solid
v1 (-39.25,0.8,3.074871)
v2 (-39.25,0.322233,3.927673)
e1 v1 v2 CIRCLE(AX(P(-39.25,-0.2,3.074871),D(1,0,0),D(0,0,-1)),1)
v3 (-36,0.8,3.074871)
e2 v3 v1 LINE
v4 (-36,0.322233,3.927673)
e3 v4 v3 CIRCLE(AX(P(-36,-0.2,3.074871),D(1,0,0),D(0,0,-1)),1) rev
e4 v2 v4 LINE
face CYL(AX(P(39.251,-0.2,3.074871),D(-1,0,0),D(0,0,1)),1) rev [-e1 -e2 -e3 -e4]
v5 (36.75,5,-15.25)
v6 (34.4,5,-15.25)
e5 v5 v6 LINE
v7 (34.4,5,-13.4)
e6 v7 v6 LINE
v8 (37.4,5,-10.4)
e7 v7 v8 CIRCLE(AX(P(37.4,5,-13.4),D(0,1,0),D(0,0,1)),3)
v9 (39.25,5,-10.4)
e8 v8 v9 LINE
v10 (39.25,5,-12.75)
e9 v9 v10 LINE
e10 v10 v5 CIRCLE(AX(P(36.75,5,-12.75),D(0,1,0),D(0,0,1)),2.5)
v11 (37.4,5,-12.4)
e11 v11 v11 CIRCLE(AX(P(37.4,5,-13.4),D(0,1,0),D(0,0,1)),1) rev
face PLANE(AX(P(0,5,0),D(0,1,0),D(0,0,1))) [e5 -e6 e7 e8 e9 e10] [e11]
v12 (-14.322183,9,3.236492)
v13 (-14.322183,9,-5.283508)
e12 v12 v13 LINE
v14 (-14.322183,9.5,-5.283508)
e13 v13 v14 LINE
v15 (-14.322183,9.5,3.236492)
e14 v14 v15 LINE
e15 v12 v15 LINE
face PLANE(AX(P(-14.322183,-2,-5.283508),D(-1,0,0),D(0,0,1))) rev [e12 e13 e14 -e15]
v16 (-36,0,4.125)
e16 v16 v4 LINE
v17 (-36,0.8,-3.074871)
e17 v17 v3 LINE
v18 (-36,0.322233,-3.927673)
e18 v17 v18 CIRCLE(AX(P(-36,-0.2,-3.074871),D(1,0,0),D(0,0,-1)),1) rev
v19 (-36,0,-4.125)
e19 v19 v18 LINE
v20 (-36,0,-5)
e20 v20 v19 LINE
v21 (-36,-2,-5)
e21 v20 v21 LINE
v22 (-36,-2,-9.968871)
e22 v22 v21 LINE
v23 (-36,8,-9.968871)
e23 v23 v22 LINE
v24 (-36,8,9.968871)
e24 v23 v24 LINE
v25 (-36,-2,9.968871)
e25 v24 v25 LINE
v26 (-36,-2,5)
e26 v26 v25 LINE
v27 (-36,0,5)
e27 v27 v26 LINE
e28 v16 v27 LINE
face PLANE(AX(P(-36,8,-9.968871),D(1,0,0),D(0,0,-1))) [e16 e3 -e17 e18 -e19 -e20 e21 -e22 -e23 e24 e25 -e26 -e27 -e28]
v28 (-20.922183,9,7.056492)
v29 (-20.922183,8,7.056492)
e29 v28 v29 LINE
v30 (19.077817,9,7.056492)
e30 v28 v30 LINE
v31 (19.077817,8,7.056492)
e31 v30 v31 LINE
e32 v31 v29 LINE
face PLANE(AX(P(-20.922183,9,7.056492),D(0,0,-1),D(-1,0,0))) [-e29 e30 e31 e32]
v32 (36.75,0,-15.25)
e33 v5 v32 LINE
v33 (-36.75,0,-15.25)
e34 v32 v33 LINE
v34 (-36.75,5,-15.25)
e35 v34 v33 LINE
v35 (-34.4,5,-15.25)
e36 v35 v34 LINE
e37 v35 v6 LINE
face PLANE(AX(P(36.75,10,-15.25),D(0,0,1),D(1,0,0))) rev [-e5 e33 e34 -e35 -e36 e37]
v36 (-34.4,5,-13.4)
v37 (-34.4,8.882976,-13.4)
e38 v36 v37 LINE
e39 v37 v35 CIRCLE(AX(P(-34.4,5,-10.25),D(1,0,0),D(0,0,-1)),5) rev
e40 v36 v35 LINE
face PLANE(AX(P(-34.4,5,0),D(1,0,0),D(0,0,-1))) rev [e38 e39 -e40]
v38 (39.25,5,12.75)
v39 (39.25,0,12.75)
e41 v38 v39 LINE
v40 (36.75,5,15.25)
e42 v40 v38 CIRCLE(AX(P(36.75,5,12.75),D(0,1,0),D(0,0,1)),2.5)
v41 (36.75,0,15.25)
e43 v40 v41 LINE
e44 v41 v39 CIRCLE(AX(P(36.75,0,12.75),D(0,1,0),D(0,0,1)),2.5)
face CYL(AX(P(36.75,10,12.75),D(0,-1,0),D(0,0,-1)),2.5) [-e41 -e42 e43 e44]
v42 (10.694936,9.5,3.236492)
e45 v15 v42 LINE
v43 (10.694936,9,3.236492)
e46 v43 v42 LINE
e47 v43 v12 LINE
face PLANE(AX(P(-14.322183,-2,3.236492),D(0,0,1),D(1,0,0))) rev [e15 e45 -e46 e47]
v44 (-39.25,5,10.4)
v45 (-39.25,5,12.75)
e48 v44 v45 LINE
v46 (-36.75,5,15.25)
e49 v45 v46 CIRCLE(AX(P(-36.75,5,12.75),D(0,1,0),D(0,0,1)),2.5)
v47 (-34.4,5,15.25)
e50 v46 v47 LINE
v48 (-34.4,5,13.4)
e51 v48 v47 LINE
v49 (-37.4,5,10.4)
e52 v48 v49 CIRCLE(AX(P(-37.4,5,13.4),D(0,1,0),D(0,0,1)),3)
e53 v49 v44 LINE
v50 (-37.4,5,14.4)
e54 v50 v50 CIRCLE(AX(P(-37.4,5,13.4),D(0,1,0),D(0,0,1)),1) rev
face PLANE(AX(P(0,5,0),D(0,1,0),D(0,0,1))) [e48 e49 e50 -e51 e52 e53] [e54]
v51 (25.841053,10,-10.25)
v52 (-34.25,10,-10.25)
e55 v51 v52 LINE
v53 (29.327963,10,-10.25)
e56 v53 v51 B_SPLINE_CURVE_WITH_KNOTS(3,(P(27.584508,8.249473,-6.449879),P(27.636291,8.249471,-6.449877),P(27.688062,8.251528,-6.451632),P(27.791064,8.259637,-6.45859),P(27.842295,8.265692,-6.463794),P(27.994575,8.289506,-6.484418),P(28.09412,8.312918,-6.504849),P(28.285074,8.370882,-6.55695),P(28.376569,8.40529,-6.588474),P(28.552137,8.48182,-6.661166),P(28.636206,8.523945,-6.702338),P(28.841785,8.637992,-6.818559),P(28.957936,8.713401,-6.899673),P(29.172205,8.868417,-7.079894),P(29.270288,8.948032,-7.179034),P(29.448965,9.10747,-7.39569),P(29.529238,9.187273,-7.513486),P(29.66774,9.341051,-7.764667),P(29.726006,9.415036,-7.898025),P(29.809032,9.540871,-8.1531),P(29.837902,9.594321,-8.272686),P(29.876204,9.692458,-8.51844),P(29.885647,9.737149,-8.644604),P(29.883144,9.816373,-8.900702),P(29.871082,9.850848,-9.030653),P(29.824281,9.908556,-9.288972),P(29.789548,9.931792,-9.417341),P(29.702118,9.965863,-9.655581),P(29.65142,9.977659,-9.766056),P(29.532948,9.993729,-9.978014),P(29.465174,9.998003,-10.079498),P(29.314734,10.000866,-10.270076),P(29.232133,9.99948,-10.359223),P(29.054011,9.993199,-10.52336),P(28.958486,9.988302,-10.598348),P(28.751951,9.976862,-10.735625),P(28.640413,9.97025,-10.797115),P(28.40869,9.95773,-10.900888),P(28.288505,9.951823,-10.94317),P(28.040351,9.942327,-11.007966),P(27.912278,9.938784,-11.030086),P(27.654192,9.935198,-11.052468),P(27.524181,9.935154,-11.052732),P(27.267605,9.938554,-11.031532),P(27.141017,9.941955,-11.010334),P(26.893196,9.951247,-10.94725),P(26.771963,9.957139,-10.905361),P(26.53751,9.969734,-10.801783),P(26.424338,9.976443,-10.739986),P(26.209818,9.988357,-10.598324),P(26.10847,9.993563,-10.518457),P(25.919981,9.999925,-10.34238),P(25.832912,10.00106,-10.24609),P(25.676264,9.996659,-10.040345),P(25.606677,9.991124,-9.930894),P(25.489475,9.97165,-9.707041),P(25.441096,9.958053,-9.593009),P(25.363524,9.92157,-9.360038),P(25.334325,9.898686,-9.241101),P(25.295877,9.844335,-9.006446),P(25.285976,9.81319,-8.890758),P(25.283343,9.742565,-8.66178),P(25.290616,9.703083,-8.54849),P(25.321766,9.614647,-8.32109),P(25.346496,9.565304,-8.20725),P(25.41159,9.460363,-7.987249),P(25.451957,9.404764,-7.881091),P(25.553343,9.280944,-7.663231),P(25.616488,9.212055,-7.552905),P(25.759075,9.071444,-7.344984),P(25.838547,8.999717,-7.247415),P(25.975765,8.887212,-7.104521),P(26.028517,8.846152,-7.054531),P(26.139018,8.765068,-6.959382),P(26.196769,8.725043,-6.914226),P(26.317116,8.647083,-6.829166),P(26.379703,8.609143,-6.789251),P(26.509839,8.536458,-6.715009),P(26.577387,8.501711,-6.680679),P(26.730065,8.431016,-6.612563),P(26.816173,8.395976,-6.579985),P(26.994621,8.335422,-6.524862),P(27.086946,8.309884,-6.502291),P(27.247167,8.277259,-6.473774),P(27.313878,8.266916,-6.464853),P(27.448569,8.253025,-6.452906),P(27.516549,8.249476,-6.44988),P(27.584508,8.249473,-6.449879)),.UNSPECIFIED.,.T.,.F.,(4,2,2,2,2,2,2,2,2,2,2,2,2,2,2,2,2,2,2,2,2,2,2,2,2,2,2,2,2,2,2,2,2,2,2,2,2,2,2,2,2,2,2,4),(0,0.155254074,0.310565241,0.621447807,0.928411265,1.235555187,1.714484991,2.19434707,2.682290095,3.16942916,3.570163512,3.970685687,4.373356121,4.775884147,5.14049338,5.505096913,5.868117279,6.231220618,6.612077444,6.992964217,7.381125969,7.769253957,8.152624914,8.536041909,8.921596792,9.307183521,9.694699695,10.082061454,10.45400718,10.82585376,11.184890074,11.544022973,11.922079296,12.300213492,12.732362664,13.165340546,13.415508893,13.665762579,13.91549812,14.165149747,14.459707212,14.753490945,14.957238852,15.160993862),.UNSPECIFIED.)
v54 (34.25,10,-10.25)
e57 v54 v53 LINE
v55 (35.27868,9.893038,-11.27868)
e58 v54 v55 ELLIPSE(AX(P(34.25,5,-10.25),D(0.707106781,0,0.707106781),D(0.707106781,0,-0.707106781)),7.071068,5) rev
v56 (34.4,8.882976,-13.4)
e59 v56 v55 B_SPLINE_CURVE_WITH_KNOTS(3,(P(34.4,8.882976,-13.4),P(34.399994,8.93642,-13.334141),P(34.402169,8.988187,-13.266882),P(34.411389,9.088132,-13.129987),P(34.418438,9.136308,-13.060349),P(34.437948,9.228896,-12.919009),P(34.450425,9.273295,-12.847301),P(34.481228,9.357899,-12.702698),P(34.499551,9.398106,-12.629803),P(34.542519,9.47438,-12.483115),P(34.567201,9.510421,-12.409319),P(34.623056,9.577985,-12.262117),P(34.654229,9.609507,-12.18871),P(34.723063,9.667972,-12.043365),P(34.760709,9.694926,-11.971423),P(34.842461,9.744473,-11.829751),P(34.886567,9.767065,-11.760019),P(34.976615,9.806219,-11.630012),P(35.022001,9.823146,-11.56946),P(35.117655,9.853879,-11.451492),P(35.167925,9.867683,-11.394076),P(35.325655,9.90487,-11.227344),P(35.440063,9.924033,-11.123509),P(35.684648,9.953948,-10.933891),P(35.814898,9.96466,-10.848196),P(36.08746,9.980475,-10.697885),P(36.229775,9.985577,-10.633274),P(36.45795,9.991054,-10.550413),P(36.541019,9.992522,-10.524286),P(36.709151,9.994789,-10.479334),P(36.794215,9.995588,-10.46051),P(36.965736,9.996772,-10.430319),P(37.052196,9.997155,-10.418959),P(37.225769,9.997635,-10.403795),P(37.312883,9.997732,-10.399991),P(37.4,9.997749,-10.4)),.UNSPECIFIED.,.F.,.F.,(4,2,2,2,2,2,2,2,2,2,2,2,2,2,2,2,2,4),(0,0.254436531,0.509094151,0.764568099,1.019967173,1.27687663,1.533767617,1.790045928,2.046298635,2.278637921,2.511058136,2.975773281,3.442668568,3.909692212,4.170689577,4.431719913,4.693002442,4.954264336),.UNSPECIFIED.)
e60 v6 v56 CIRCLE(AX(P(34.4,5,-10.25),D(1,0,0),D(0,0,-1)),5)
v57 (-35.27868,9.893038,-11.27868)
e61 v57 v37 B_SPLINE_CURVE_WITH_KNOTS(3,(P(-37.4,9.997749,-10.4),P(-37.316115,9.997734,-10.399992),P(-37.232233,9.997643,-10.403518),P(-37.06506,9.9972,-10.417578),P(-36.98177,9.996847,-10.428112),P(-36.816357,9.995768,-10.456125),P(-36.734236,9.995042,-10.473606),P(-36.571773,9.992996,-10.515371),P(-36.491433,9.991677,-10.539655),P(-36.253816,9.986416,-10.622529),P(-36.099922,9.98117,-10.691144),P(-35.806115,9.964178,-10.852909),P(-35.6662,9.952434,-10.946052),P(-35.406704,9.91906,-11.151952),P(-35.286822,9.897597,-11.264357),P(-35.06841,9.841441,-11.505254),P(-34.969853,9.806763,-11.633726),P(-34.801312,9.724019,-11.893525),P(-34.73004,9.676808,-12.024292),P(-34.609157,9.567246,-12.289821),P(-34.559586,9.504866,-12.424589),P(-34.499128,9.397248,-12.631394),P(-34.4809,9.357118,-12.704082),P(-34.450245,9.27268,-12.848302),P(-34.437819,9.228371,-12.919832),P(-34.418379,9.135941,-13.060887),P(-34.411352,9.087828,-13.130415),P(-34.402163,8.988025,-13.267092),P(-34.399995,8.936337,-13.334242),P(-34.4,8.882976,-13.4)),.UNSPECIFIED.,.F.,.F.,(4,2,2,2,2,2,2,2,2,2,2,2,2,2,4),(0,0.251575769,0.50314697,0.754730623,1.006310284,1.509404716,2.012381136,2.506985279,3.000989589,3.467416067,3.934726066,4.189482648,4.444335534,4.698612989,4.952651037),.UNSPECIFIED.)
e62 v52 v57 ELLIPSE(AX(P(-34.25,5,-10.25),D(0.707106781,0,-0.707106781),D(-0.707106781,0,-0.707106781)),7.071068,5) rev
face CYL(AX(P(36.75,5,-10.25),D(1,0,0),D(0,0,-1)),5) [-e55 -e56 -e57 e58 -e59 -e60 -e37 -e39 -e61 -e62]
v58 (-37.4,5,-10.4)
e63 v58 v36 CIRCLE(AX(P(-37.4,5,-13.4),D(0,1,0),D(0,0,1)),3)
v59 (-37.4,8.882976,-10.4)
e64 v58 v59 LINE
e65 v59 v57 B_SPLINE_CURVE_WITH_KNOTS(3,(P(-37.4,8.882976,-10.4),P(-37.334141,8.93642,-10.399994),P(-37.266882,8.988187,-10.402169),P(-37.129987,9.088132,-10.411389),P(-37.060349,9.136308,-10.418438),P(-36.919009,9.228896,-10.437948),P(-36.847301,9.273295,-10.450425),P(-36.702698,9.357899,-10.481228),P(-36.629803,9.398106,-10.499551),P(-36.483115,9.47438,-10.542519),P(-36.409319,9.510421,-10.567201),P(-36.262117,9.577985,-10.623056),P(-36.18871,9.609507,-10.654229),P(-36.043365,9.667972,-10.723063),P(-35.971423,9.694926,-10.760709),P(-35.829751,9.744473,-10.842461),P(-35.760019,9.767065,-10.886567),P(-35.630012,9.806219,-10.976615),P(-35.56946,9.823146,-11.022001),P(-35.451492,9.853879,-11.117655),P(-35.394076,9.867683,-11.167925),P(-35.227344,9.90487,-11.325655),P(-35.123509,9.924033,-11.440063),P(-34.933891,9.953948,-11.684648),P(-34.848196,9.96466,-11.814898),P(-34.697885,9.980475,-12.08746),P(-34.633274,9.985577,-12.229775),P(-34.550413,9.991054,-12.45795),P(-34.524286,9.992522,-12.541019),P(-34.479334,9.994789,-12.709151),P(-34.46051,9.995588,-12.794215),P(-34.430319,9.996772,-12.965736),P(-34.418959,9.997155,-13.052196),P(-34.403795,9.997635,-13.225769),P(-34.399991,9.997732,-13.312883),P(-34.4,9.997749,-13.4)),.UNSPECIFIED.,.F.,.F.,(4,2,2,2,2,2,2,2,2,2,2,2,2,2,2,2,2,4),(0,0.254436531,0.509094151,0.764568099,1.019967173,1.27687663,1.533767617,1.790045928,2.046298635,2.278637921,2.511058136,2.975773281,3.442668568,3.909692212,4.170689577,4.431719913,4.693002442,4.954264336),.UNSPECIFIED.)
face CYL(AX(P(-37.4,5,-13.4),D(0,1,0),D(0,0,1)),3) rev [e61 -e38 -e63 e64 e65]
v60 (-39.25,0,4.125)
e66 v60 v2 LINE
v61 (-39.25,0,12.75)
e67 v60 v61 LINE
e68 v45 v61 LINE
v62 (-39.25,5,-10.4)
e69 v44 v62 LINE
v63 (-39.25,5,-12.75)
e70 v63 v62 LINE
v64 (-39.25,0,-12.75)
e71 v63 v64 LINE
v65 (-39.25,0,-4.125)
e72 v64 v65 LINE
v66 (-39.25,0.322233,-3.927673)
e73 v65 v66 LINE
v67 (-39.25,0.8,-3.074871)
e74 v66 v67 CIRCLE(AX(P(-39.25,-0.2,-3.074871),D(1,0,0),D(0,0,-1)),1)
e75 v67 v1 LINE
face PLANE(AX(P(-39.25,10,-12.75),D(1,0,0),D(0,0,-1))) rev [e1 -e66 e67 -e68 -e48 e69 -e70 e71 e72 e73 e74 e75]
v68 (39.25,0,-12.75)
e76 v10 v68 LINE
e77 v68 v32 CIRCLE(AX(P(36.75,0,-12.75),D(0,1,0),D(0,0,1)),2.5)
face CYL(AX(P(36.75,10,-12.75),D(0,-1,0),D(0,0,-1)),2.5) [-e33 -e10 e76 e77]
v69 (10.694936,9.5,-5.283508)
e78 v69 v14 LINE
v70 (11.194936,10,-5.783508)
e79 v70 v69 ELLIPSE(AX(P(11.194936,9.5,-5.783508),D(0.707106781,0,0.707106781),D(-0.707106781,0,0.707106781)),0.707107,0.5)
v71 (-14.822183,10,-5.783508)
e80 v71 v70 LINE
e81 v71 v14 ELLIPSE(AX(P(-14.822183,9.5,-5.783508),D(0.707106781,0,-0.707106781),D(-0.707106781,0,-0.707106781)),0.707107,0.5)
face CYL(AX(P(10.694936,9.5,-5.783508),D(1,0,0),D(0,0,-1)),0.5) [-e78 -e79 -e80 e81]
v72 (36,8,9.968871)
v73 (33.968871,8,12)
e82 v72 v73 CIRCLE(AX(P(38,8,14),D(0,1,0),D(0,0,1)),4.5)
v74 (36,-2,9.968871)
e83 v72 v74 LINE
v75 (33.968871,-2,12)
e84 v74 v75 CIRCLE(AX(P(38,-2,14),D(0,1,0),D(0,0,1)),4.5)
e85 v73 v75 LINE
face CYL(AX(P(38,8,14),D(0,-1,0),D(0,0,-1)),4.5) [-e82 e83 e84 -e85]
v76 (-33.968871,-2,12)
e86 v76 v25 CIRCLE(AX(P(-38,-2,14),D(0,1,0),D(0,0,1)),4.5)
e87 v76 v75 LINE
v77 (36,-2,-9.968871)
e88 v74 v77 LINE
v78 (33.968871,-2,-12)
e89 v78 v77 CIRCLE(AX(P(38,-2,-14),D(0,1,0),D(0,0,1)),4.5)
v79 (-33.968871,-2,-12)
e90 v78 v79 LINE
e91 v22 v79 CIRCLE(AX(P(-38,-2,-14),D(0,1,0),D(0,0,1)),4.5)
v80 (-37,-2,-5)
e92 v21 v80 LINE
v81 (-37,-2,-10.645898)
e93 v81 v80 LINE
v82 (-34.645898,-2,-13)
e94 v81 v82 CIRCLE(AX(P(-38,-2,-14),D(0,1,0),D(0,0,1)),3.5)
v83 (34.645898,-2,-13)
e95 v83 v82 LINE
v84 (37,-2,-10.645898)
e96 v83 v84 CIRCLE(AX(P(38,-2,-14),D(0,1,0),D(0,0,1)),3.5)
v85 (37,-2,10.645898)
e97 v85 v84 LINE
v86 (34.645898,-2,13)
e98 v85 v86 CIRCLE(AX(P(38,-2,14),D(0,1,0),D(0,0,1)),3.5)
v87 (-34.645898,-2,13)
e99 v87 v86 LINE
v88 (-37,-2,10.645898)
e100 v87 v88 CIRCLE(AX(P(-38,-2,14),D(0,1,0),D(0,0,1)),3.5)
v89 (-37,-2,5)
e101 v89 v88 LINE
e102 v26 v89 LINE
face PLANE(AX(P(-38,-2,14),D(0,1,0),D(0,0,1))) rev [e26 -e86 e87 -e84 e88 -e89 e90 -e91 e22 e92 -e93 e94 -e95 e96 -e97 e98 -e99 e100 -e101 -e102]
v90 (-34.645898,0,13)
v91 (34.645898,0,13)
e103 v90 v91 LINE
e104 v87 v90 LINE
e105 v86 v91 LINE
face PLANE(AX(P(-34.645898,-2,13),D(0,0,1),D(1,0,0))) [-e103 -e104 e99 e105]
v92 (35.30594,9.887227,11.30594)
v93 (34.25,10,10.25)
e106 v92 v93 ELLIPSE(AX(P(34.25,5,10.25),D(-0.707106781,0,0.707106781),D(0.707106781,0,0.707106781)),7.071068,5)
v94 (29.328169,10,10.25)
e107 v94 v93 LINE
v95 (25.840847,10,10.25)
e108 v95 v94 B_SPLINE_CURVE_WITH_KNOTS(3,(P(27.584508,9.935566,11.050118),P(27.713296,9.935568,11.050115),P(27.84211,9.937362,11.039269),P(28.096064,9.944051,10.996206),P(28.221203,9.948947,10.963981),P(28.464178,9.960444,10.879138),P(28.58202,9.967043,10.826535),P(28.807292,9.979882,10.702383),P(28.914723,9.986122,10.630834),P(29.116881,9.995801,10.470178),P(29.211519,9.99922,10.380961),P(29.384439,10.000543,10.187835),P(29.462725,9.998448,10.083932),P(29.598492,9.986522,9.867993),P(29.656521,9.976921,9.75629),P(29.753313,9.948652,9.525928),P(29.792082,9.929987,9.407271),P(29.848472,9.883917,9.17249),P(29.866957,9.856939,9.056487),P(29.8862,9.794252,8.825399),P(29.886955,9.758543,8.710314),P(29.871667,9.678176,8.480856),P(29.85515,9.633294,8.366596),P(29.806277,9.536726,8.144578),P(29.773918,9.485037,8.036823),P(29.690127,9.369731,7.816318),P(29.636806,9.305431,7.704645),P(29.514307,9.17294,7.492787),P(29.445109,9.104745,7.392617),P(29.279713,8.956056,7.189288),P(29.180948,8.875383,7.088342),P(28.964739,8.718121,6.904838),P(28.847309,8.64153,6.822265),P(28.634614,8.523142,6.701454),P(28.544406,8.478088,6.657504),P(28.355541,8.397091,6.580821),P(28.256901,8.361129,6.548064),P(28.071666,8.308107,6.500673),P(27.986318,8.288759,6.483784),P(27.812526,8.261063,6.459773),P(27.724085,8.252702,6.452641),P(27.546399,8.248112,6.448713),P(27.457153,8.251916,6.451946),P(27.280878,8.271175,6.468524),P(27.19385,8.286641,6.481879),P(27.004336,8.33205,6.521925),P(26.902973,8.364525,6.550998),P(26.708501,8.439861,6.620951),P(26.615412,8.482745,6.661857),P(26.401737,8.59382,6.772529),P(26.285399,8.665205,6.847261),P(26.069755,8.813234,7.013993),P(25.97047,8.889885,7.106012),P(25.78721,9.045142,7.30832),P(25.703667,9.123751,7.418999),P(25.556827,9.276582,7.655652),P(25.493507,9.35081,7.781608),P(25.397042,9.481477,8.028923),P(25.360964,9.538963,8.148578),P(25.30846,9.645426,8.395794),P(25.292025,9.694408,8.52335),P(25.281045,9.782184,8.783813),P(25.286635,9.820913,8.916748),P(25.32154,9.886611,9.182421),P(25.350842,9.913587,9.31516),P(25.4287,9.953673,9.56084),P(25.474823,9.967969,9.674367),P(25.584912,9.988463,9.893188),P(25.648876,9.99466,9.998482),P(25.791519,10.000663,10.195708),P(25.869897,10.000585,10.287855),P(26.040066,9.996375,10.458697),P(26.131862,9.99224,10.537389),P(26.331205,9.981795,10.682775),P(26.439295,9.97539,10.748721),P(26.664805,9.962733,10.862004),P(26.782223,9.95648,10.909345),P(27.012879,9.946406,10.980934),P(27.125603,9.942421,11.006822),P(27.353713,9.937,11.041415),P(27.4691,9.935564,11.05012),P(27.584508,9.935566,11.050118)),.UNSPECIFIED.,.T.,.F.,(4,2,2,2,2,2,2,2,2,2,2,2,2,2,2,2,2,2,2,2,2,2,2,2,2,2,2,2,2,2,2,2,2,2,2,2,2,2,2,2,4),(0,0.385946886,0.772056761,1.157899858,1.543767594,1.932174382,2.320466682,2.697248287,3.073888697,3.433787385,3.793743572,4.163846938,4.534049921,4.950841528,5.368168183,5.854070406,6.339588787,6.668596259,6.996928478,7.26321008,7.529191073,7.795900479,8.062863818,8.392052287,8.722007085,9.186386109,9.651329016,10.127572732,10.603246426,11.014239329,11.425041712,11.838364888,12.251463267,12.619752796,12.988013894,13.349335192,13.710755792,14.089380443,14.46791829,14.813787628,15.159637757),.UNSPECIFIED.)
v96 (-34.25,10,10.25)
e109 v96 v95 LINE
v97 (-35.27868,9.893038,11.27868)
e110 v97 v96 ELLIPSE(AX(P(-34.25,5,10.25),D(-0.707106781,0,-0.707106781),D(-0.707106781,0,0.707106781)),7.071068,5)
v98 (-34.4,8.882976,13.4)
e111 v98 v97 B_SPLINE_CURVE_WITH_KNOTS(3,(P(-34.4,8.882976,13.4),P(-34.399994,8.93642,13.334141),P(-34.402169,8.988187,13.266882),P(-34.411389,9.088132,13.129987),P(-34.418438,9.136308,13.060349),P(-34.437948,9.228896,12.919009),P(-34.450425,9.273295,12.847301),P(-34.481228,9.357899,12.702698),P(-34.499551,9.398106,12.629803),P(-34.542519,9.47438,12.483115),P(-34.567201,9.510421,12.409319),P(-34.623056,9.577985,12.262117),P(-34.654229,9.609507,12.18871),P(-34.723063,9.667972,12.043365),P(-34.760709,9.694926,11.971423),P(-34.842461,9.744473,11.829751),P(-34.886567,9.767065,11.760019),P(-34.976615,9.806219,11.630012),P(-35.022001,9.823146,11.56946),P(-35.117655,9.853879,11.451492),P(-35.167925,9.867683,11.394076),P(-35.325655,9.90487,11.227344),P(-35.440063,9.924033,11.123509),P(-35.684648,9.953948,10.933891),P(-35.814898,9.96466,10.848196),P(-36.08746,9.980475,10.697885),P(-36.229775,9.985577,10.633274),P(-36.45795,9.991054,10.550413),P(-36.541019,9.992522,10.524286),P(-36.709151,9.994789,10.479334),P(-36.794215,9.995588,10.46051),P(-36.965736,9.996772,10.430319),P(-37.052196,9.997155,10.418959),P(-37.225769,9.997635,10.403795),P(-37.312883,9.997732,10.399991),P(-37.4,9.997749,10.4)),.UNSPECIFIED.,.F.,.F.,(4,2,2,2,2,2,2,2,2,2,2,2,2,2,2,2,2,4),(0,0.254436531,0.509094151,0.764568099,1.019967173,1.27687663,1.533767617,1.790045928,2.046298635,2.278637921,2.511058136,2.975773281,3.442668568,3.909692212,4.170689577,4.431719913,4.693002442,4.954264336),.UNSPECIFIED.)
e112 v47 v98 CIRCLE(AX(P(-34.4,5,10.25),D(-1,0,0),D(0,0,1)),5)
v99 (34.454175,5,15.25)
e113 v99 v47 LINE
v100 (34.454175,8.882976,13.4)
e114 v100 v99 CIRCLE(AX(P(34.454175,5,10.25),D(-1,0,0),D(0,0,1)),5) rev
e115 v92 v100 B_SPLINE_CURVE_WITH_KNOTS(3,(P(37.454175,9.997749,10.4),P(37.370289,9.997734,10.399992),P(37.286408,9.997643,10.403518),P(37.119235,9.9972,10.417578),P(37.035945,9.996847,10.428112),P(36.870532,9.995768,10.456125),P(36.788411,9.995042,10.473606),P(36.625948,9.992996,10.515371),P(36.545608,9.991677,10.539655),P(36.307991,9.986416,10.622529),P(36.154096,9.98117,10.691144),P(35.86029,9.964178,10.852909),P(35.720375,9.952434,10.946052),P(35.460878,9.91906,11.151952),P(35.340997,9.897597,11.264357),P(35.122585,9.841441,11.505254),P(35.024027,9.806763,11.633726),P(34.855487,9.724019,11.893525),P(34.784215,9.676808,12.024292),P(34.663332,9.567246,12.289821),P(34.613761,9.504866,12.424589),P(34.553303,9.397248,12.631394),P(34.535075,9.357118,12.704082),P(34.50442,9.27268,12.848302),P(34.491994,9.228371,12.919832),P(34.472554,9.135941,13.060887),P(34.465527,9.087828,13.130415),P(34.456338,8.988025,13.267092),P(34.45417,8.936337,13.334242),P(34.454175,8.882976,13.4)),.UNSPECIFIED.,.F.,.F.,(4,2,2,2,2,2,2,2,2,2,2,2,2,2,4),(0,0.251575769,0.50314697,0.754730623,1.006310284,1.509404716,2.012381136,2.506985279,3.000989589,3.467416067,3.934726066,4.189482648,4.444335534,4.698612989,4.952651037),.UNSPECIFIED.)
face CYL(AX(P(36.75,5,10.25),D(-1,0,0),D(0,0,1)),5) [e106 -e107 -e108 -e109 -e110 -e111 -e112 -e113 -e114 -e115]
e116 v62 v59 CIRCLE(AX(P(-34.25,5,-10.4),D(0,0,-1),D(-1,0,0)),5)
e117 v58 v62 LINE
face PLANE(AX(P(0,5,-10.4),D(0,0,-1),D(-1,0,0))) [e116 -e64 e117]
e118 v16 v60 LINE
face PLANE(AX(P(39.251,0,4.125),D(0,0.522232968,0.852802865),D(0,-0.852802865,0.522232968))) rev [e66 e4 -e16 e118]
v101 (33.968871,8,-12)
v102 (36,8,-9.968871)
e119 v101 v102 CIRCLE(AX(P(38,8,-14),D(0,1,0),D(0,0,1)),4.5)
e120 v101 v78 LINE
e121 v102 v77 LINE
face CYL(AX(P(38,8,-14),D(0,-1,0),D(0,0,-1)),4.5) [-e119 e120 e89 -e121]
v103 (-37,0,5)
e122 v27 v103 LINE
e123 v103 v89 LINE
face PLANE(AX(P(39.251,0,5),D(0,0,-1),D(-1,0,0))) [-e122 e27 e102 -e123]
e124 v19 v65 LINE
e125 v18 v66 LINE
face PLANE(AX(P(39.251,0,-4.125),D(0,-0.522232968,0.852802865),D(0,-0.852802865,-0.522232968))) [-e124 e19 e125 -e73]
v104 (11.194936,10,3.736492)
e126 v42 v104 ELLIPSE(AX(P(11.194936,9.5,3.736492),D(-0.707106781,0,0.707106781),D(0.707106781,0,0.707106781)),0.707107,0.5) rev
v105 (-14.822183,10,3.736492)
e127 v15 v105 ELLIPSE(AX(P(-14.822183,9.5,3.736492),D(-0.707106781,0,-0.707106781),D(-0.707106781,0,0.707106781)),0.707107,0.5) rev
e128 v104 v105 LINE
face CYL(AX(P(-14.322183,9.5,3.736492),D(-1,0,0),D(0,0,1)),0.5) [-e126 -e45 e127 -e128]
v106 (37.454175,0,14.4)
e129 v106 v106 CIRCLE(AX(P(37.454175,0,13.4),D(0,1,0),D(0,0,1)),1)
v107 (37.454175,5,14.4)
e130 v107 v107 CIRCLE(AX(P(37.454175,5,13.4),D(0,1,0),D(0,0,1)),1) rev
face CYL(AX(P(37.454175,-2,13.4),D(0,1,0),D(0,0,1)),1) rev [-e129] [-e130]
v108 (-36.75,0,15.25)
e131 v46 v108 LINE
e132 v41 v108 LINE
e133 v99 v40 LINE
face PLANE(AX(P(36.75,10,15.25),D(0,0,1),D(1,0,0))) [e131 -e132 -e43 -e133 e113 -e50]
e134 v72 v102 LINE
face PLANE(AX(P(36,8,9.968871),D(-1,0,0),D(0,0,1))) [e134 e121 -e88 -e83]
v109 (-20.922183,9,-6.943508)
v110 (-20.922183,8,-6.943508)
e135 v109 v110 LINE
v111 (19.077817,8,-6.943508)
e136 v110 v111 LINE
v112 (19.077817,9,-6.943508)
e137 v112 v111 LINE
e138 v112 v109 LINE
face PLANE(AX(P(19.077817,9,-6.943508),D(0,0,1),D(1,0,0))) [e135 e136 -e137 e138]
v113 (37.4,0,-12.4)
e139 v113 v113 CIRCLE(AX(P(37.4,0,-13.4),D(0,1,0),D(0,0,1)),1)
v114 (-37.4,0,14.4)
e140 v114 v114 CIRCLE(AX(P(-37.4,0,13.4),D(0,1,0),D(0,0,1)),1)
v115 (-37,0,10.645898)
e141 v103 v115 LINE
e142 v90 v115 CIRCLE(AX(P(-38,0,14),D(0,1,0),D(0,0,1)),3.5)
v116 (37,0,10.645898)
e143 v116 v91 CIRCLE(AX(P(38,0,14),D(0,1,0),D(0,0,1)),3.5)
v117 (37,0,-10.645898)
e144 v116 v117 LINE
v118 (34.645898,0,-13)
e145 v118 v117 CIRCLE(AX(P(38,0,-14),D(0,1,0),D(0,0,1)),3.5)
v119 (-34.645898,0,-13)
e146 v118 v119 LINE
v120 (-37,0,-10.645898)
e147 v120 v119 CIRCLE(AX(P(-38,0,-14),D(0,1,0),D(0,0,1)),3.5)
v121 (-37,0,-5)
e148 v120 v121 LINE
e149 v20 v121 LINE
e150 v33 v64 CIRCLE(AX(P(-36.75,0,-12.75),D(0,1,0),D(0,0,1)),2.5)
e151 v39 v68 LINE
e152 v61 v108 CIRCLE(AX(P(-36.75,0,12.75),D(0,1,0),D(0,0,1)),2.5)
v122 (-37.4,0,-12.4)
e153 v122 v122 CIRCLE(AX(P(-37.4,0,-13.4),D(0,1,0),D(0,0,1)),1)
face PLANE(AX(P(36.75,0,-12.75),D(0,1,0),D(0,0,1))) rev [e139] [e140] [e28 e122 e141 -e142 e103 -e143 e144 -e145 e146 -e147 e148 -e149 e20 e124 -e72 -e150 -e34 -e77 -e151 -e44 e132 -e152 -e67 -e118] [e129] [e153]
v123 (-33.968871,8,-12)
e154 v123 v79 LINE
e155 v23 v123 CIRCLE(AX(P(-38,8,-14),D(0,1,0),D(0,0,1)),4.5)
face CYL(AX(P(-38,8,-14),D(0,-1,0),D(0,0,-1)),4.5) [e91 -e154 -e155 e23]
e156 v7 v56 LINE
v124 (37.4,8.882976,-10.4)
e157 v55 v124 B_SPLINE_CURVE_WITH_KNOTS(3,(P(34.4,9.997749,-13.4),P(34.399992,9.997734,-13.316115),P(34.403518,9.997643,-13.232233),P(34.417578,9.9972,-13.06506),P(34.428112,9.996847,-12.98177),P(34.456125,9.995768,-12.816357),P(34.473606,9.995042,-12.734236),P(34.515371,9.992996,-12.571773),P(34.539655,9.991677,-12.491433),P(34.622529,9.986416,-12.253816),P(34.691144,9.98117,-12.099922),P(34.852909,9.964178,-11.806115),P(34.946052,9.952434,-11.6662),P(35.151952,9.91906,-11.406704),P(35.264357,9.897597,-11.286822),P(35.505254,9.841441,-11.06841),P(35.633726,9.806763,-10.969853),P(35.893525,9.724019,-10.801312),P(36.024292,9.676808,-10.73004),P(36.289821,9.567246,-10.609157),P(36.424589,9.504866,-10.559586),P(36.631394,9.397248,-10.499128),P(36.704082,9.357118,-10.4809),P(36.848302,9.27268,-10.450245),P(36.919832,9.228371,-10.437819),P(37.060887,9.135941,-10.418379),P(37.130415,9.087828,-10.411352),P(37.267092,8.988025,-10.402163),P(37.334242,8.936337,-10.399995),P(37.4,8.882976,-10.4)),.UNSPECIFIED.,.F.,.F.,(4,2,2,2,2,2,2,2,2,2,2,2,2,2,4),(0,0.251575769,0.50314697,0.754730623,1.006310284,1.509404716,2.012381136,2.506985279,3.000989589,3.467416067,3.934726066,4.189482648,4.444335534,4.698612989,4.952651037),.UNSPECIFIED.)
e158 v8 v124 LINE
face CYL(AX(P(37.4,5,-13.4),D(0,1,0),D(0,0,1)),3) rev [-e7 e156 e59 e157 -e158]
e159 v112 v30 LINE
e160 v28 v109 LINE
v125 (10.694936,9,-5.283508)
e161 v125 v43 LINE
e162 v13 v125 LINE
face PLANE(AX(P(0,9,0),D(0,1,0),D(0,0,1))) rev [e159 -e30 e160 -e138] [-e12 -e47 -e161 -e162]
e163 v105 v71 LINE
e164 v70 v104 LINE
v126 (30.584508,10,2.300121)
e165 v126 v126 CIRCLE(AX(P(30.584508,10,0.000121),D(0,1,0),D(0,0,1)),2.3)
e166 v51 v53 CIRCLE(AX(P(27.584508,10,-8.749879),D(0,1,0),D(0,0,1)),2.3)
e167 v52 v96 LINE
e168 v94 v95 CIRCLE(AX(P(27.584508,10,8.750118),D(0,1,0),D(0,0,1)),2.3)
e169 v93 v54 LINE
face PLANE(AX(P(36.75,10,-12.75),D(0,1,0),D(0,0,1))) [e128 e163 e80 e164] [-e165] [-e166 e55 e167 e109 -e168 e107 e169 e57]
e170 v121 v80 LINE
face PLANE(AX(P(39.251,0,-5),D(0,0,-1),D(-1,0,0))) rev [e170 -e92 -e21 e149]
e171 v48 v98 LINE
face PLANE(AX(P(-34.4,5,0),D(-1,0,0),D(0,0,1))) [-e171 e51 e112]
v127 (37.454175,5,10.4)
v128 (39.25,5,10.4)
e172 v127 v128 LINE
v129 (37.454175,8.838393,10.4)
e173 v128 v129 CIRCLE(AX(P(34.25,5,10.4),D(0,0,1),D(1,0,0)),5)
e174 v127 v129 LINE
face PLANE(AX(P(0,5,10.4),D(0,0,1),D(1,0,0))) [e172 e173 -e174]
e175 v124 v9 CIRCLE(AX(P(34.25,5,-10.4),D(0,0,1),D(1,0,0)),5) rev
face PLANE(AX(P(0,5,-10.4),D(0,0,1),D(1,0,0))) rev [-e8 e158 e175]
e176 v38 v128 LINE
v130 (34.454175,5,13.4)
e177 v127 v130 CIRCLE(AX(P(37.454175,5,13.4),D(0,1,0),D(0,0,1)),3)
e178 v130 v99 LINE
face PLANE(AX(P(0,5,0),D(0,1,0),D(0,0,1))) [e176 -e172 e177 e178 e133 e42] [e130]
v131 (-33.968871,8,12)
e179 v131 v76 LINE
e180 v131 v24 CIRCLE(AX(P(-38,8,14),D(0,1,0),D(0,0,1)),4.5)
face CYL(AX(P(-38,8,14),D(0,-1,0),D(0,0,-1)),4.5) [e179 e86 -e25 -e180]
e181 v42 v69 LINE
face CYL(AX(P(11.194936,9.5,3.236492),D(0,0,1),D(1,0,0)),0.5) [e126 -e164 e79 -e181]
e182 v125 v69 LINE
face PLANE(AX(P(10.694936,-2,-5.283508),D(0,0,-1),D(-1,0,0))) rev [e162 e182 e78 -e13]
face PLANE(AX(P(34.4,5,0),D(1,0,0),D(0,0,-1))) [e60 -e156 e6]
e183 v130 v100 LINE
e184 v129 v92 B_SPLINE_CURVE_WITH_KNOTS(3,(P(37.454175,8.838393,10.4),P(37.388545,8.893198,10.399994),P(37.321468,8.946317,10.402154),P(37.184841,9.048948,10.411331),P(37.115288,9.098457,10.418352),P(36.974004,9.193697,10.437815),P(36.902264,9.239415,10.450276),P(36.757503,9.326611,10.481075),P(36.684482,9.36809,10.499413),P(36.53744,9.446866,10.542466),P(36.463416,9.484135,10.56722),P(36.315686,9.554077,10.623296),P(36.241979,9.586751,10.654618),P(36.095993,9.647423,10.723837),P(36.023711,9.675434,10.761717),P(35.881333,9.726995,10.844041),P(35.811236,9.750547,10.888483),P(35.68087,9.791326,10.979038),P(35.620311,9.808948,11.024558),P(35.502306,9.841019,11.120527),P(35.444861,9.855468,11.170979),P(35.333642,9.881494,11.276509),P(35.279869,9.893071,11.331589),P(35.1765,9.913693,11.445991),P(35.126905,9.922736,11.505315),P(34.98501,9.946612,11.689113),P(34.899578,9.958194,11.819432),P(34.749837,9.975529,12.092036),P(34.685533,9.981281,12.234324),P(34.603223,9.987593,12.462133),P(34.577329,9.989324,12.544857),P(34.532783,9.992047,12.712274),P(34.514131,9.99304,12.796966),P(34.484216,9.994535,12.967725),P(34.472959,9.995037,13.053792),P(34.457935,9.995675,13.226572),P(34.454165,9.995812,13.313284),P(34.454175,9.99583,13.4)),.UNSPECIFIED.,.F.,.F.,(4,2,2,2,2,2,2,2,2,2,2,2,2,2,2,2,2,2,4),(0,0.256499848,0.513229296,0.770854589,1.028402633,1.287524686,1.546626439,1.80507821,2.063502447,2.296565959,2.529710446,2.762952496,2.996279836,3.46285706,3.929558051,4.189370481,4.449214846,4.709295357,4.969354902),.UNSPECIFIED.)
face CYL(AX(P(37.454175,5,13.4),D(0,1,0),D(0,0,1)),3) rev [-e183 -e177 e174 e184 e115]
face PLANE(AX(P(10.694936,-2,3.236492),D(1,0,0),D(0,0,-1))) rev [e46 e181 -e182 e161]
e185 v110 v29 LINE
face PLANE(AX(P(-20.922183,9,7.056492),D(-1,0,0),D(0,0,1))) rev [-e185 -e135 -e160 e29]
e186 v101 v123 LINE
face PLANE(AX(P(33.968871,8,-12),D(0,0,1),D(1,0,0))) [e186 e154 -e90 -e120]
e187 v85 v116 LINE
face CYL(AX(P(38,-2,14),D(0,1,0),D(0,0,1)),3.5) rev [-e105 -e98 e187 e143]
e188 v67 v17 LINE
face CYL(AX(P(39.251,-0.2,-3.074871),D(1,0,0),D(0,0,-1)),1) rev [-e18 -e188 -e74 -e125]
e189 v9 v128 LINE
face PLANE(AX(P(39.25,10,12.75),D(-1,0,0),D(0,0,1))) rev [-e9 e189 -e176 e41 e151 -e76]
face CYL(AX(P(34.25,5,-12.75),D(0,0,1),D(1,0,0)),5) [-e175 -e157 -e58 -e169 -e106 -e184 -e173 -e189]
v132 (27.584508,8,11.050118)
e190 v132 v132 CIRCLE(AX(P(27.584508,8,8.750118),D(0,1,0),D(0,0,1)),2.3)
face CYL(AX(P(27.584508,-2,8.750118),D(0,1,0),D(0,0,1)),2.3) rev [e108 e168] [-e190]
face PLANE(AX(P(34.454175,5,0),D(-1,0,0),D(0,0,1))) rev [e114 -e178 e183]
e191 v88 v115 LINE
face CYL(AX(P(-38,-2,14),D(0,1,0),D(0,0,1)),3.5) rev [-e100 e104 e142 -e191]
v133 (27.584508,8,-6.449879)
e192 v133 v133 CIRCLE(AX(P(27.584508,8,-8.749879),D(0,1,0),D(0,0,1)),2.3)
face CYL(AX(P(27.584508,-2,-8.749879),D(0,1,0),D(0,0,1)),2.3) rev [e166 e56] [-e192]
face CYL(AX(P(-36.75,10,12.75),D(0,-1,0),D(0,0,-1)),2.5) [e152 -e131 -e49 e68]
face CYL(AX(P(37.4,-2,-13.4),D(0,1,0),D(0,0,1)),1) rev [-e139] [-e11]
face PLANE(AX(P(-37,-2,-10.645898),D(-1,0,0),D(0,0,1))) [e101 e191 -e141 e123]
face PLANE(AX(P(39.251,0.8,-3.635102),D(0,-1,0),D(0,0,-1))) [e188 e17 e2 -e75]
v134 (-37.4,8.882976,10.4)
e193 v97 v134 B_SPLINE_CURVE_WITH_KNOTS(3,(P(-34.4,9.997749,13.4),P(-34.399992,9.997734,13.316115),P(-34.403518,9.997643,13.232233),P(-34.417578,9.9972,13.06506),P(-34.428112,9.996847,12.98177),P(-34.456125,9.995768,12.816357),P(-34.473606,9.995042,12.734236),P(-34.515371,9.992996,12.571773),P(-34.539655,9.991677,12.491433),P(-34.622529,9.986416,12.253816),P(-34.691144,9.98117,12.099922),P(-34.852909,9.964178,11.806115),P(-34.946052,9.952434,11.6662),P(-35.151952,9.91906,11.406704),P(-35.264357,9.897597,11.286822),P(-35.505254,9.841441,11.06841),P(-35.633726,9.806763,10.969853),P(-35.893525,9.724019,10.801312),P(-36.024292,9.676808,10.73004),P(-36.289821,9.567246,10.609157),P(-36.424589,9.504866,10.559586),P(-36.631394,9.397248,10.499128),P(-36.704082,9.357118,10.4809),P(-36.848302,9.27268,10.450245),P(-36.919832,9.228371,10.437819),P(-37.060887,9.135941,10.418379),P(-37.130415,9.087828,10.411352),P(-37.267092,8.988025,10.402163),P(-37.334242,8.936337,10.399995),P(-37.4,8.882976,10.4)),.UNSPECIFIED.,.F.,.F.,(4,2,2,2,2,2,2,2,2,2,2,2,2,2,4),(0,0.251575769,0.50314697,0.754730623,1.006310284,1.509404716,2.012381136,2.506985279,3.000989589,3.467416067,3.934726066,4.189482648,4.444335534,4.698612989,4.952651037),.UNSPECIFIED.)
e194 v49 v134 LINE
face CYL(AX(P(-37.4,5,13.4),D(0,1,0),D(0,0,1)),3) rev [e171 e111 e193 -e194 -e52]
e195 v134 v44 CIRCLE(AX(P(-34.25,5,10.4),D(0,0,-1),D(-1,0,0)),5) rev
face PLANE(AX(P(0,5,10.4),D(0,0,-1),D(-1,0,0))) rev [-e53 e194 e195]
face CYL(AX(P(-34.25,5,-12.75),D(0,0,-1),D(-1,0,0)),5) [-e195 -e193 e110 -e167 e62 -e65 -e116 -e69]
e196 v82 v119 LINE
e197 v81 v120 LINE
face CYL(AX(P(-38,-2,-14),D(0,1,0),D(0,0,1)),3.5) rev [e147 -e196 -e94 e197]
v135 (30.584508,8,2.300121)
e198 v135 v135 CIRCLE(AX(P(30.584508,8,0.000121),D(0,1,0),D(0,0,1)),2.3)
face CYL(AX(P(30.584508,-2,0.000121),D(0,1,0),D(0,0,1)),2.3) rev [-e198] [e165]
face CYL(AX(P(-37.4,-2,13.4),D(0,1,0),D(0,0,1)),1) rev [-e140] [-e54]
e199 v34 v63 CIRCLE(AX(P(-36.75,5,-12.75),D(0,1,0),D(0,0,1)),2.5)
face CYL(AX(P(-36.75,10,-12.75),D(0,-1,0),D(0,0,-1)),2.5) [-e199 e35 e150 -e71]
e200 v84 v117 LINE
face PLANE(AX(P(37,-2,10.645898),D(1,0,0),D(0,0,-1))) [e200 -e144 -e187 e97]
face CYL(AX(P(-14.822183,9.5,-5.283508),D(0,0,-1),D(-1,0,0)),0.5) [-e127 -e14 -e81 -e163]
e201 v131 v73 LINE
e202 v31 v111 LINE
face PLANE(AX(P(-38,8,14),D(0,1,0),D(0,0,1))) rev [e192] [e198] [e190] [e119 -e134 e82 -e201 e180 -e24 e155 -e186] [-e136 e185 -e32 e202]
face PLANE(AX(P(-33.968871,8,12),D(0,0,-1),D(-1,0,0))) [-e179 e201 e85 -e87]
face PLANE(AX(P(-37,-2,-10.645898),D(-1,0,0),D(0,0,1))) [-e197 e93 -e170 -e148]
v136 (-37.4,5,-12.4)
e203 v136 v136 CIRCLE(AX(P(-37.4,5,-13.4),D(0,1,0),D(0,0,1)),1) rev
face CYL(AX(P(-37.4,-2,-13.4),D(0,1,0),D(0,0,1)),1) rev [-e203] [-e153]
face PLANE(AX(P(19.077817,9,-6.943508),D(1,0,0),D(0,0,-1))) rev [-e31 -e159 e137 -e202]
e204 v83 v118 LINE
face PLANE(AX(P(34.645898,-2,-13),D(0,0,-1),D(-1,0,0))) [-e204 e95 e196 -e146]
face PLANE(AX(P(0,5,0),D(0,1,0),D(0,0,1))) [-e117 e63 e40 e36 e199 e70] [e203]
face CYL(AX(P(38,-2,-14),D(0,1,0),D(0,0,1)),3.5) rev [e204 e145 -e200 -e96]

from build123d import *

# Parameters (mm, degrees)
EXTRUDE_1276_DEPTH          = 10
CUT_EXTRUDE_1340_DEPTH      = 8
EXTRUDE_1406_DEPTH          = 2
CUT_EXTRUDE_1479_DEPTH      = 2
CUT_EXTRUDE_1479_DEPTH_BACK = 2
CUT_EXTRUDE_1550_DEPTH      = 44.279614139
CUT_EXTRUDE_1550_DEPTH_BACK = 44.279614139
SKETCH_1_7_R                = 1
USB_REACH                   = 80.4
USB_2_W                     = 10
USB_2_H                     = 2
CUT_EXTRUDE_START           = -5
SKETCH_3_R                  = 1
CUT_EXTRUDE_3145_DEPTH      = 5
FILLET_3202_R               = 5
CUT_EXTRUDE_3663_DEPTH      = 44.279614288
CUT_EXTRUDE_3663_DEPTH_BACK = 44.279614288
SKETCH_8_W                  = 25.017119527
SKETCH_8_H                  = 8.52
SKETCH_11_W                 = 40
SKETCH_11_H                 = 14
CUT_EXTRUDE_3720_DEPTH      = 9
FILLET_3777_R               = 0.5
CUT_EXTRUDE_12_REACH        = 82.59
USB_4_R                     = 1
CUT_EXTRUDE_4523_DEPTH      = 44.279614288
CUT_EXTRUDE_4523_DEPTH_BACK = 44.279614288
SKETCH_13_R                 = 2.3


with BuildPart() as part:
    # Sketch 378 → Extrude 1276 (new body)
    with BuildSketch(Plane(origin=(0, 0, 0), x_dir=(1, 0, 0), z_dir=(0, 1, 0))):
        with BuildLine():
            Line((-39.25, 12.75), (-39.25, -12.75))
            ThreePointArc((-39.25, -12.75), (-38.517766953, -14.517766953), (-36.75, -15.25))
            Line((-36.75, -15.25), (36.75, -15.25))
            ThreePointArc((36.75, -15.25), (38.517766953, -14.517766953), (39.25, -12.75))
            Line((39.25, -12.75), (39.25, 12.75))
            ThreePointArc((39.25, 12.75), (38.517766953, 14.517766953), (36.75, 15.25))
            Line((36.75, 15.25), (-36.75, 15.25))
            ThreePointArc((-36.75, 15.25), (-38.517766953, 14.517766953), (-39.25, 12.75))
        make_face()
    extrude(amount=EXTRUDE_1276_DEPTH)

    # Эскиз1<3> → Cut-Extrude 1340 (cut)
    with BuildSketch(Plane(origin=(0, 0, 0), x_dir=(1, 0, 0), z_dir=(0, 1, 0))):
        with BuildLine():
            Line((33.968871126, 12), (-33.968871126, 12))
            ThreePointArc((-33.968871126, 12), (-34.818019485, 10.818019485), (-36, 9.968871126))
            Line((-36, 9.968871126), (-36, -9.968871126))
            ThreePointArc((-36, -9.968871126), (-34.818019485, -10.818019485), (-33.968871126, -12))
            Line((-33.968871126, -12), (33.968871126, -12))
            ThreePointArc((33.968871126, -12), (34.818019485, -10.818019485), (36, -9.968871126))
            Line((36, -9.968871126), (36, 9.968871126))
            ThreePointArc((36, 9.968871126), (34.818019485, 10.818019485), (33.968871126, 12))
        make_face()
    extrude(amount=CUT_EXTRUDE_1340_DEPTH, mode=Mode.SUBTRACT)

    # Эскиз1<4> → Extrude 1406 (add)
    with BuildSketch(Plane(origin=(0, 0, 0), x_dir=(1, 0, 0), z_dir=(0, 1, 0))):
        with BuildLine():
            Line((34.645898034, 13), (-34.645898034, 13))
            ThreePointArc((-34.645898034, 13), (-35.525126266, 11.525126266), (-37, 10.645898034))
            Line((-37, 10.645898034), (-37, -10.645898034))
            ThreePointArc((-37, -10.645898034), (-35.525126266, -11.525126266), (-34.645898034, -13))
            Line((-34.645898034, -13), (34.645898034, -13))
            ThreePointArc((34.645898034, -13), (35.525126266, -11.525126266), (37, -10.645898034))
            Line((37, -10.645898034), (37, 10.645898034))
            ThreePointArc((37, 10.645898034), (35.525126266, 11.525126266), (34.645898034, 13))
        make_face()
    extrude(amount=-EXTRUDE_1406_DEPTH)

    # Эскиз1<6> → Cut-Extrude 1479 (cut, two sides: drawn at the far end of the back side and taken through both)
    with BuildSketch(Plane(origin=(0, 0, 0), x_dir=(1, 0, 0), z_dir=(0, 1, 0)).offset(-CUT_EXTRUDE_1479_DEPTH_BACK)):
        with BuildLine():
            Line((33.968871126, 12), (-33.968871126, 12))
            ThreePointArc((-33.968871126, 12), (-34.818019485, 10.818019485), (-36, 9.968871126))
            Line((-36, 9.968871126), (-36, -9.968871126))
            ThreePointArc((-36, -9.968871126), (-34.818019485, -10.818019485), (-33.968871126, -12))
            Line((-33.968871126, -12), (33.968871126, -12))
            ThreePointArc((33.968871126, -12), (34.818019485, -10.818019485), (36, -9.968871126))
            Line((36, -9.968871126), (36, 9.968871126))
            ThreePointArc((36, 9.968871126), (34.818019485, 10.818019485), (33.968871126, 12))
        make_face()
    extrude(amount=CUT_EXTRUDE_1479_DEPTH + CUT_EXTRUDE_1479_DEPTH_BACK, mode=Mode.SUBTRACT)

    # Эскиз1<7> → Cut-Extrude 1550 (cut, two sides: drawn at the far end of the back side and taken through both)
    with BuildSketch(Plane(origin=(0, 0, 0), x_dir=(1, 0, 0), z_dir=(0, 1, 0)).offset(-CUT_EXTRUDE_1550_DEPTH_BACK)):
        with Locations(Location((37.454174909, -13.4, 0), (0, 0, 270))):
            Circle(SKETCH_1_7_R)
        with Locations(Location((-37.4, 13.4, 0), (0, 0, 270))):
            Circle(SKETCH_1_7_R)
        with Locations(Location((37.4, 13.4, 0), (0, 0, 270))):
            Circle(SKETCH_1_7_R)
        with Locations(Location((-37.4, -13.4, 0), (0, 0, 270))):
            Circle(SKETCH_1_7_R)
    extrude(amount=CUT_EXTRUDE_1550_DEPTH + CUT_EXTRUDE_1550_DEPTH_BACK, mode=Mode.SUBTRACT)

    # USB 2 → USB (cut, up to next)
    with BuildSketch(Plane.ZY.offset(37), mode=Mode.PRIVATE) as usb_sk1:
        with Locations((0, -1)):
            Rectangle(USB_2_W, USB_2_H)
    usb_tool1 = extrude(usb_sk1.sketch, amount=-USB_REACH, mode=Mode.PRIVATE) & part.part
    add(usb_tool1.solids().sort_by_distance((-37, -1, 0))[0], mode=Mode.SUBTRACT)

    # Эскиз3 → Cut-Extrude 3145 (cut)
    # profile 1 of 4: a face of its own
    with BuildSketch(Plane(origin=(0, 10, 0), x_dir=(1, 0, 0), z_dir=(0, 1, 0)).offset(CUT_EXTRUDE_START)):
        with BuildLine():
            Line((-34.4, 13.4), (-34.4, 15.25))
            Line((-34.4, 15.25), (-36.75, 15.25))
            ThreePointArc((-36.75, 15.25), (-38.517766953, 14.517766953), (-39.25, 12.75))
            Line((-39.25, 12.75), (-39.25, 10.4))
            Line((-39.25, 10.4), (-37.4, 10.4))
            ThreePointArc((-37.4, 10.4), (-35.278679656, 11.278679656), (-34.4, 13.4))
        make_face()
        with Locations(Location((-37.4, 13.4, 0), (0, 0, 270))):
            Circle(SKETCH_3_R, mode=Mode.SUBTRACT)
    # profile 2 of 4: a face of its own
    with BuildSketch(Plane(origin=(0, 10, 0), x_dir=(1, 0, 0), z_dir=(0, 1, 0)).offset(CUT_EXTRUDE_START)):
        with BuildLine():
            Line((-36.75, -15.25), (-34.4, -15.25))
            Line((-34.4, -15.25), (-34.4, -13.4))
            ThreePointArc((-34.4, -13.4), (-35.278679656, -11.278679656), (-37.4, -10.4))
            Line((-37.4, -10.4), (-39.25, -10.4))
            Line((-39.25, -10.4), (-39.25, -12.75))
            ThreePointArc((-39.25, -12.75), (-38.517766953, -14.517766953), (-36.75, -15.25))
        make_face()
        with Locations(Location((-37.4, -13.4, 0), (0, 0, 270))):
            Circle(SKETCH_3_R, mode=Mode.SUBTRACT)
    # profile 3 of 4: a face of its own
    with BuildSketch(Plane(origin=(0, 10, 0), x_dir=(1, 0, 0), z_dir=(0, 1, 0)).offset(CUT_EXTRUDE_START)):
        with BuildLine():
            ThreePointArc((36.75, -15.25), (38.517766953, -14.517766953), (39.25, -12.75))
            Line((39.25, -12.75), (39.25, -10.4))
            Line((39.25, -10.4), (37.454174909, -10.4))
            ThreePointArc((37.454174909, -10.4), (35.332854565, -11.278679656), (34.454174909, -13.4))
            Line((34.454174909, -13.4), (34.454174909, -15.25))
            Line((34.454174909, -15.25), (36.75, -15.25))
        make_face()
        with Locations(Location((37.454174909, -13.4, 0), (0, 0, 270))):
            Circle(SKETCH_3_R, mode=Mode.SUBTRACT)
    # profile 4 of 4: a face of its own
    with BuildSketch(Plane(origin=(0, 10, 0), x_dir=(1, 0, 0), z_dir=(0, 1, 0)).offset(CUT_EXTRUDE_START)):
        with BuildLine():
            Line((37.4, 10.4), (39.25, 10.4))
            Line((39.25, 10.4), (39.25, 12.75))
            ThreePointArc((39.25, 12.75), (38.517766953, 14.517766953), (36.75, 15.25))
            Line((36.75, 15.25), (34.4, 15.25))
            Line((34.4, 15.25), (34.4, 13.4))
            ThreePointArc((34.4, 13.4), (35.278679656, 11.278679656), (37.4, 10.4))
        make_face()
        with Locations(Location((37.4, 13.4, 0), (0, 0, 270))):
            Circle(SKETCH_3_R, mode=Mode.SUBTRACT)
    extrude(amount=CUT_EXTRUDE_3145_DEPTH, mode=Mode.SUBTRACT)

    # Fillet 3202
    # the kernel refuses this fillet: 5 mm, written as the material it takes off along each edge
    with BuildSketch(Plane(origin=(-39.25, 10, -22.9), x_dir=(0, -1, 0), z_dir=(0, 0, 1)), Plane(origin=(39.25, 10, 22.9), x_dir=(0, -1, 0), z_dir=(0, 0, -1))) as fillet_3202_piece_1:
        with BuildLine():
            CenterArc((FILLET_3202_R, FILLET_3202_R), FILLET_3202_R, 180, 90)
            Line((0, FILLET_3202_R), (0, 0))
            Line((0, 0), (FILLET_3202_R, 0))
        make_face()
    extrude(amount=45.8, mode=Mode.SUBTRACT)
    with BuildSketch(Plane(origin=(46.9, 10, -15.25), x_dir=(0, -1, 0), z_dir=(-1, 0, 0))) as fillet_3202_piece_2:
        with BuildLine():
            CenterArc((FILLET_3202_R, FILLET_3202_R), FILLET_3202_R, 180, 90)
            Line((0, FILLET_3202_R), (0, 0))
            Line((0, 0), (FILLET_3202_R, 0))
        make_face()
    extrude(amount=93.8, mode=Mode.SUBTRACT)
    with BuildSketch(Plane(origin=(-46.9, 10, 15.25), x_dir=(0, -1, 0), z_dir=(1, 0, 0))) as fillet_3202_piece_3:
        with BuildLine():
            CenterArc((FILLET_3202_R, FILLET_3202_R), FILLET_3202_R, 180, 90)
            Line((0, FILLET_3202_R), (0, 0))
            Line((0, 0), (FILLET_3202_R, 0))
        make_face()
    extrude(amount=93.854174909, mode=Mode.SUBTRACT)

    # основной эскиз<8> → Cut-Extrude 3663 (cut, two sides: drawn at the far end of the back side and taken through both)
    with BuildSketch(Plane(origin=(0, 0, 0), x_dir=(1, 0, 0), z_dir=(0, 1, 0)).offset(-CUT_EXTRUDE_3663_DEPTH_BACK)):
        with Locations((-1.813623337, 1.023507904)):
            Rectangle(SKETCH_8_W, SKETCH_8_H)
    extrude(amount=CUT_EXTRUDE_3663_DEPTH + CUT_EXTRUDE_3663_DEPTH_BACK, mode=Mode.SUBTRACT)

    # основной эскиз<11> → Cut-Extrude 3720 (cut)
    with BuildSketch(Plane(origin=(0, 0, 0), x_dir=(1, 0, 0), z_dir=(0, 1, 0))):
        with Locations((-0.9221831, -0.056492096)):
            Rectangle(SKETCH_11_W, SKETCH_11_H)
    extrude(amount=CUT_EXTRUDE_3720_DEPTH, mode=Mode.SUBTRACT)

    # Fillet 3777
    fillet_3777_edges = [part.edges().sort_by_distance(p)[0] for p in [
        (10.694936427, 10, -1.023507904),
        (-1.813623336, 10, -5.283507904),
        (-14.3221831, 10, -1.023507904),
        (-1.813623336, 10, 3.236492096),
    ]]
    fillet(fillet_3777_edges, radius=FILLET_3777_R)

    # USB 3 → Вырез-Вытянуть12 (cut, up to next)
    with BuildSketch(Plane.ZY.offset(39.25), mode=Mode.PRIVATE) as cut_extrude_12_sk1:
        Polygon((-4.125, -0.7), (4.125, -0.7), (4.125, 0), (3.635102051, 0.8), (-3.635102051, 0.8), (-4.125, 0), align=None)
    cut_extrude_12_tool1 = extrude(cut_extrude_12_sk1.sketch, amount=-CUT_EXTRUDE_12_REACH, mode=Mode.PRIVATE) & part.part
    add(cut_extrude_12_tool1.solids().sort_by_distance((-39.25, 0.034192, 0))[0], mode=Mode.SUBTRACT)

    # USB 4
    usb_4_edges = [part.edges().sort_by_distance(p)[0] for p in [
        (-37.625, 0.8, 3.635102051),
        (-37.625, 0.8, -3.635102051),
    ]]
    fillet(usb_4_edges, radius=USB_4_R)

    # основной эскиз<13> → Cut-Extrude 4523 (cut, two sides: drawn at the far end of the back side and taken through both)
    with BuildSketch(Plane(origin=(0, 0, 0), x_dir=(1, 0, 0), z_dir=(0, 1, 0)).offset(-CUT_EXTRUDE_4523_DEPTH_BACK)):
        with Locations(Location((27.584507944, 8.749878541, 0), (0, 0, 270))):
            Circle(SKETCH_13_R)
        with Locations(Location((30.584507944, -0.000121459, 0), (0, 0, 270))):
            Circle(SKETCH_13_R)
        with Locations(Location((27.584507944, -8.750117644, 0), (0, 0, 270))):
            Circle(SKETCH_13_R)
    extrude(amount=CUT_EXTRUDE_4523_DEPTH + CUT_EXTRUDE_4523_DEPTH_BACK, mode=Mode.SUBTRACT)


solid = part.part
